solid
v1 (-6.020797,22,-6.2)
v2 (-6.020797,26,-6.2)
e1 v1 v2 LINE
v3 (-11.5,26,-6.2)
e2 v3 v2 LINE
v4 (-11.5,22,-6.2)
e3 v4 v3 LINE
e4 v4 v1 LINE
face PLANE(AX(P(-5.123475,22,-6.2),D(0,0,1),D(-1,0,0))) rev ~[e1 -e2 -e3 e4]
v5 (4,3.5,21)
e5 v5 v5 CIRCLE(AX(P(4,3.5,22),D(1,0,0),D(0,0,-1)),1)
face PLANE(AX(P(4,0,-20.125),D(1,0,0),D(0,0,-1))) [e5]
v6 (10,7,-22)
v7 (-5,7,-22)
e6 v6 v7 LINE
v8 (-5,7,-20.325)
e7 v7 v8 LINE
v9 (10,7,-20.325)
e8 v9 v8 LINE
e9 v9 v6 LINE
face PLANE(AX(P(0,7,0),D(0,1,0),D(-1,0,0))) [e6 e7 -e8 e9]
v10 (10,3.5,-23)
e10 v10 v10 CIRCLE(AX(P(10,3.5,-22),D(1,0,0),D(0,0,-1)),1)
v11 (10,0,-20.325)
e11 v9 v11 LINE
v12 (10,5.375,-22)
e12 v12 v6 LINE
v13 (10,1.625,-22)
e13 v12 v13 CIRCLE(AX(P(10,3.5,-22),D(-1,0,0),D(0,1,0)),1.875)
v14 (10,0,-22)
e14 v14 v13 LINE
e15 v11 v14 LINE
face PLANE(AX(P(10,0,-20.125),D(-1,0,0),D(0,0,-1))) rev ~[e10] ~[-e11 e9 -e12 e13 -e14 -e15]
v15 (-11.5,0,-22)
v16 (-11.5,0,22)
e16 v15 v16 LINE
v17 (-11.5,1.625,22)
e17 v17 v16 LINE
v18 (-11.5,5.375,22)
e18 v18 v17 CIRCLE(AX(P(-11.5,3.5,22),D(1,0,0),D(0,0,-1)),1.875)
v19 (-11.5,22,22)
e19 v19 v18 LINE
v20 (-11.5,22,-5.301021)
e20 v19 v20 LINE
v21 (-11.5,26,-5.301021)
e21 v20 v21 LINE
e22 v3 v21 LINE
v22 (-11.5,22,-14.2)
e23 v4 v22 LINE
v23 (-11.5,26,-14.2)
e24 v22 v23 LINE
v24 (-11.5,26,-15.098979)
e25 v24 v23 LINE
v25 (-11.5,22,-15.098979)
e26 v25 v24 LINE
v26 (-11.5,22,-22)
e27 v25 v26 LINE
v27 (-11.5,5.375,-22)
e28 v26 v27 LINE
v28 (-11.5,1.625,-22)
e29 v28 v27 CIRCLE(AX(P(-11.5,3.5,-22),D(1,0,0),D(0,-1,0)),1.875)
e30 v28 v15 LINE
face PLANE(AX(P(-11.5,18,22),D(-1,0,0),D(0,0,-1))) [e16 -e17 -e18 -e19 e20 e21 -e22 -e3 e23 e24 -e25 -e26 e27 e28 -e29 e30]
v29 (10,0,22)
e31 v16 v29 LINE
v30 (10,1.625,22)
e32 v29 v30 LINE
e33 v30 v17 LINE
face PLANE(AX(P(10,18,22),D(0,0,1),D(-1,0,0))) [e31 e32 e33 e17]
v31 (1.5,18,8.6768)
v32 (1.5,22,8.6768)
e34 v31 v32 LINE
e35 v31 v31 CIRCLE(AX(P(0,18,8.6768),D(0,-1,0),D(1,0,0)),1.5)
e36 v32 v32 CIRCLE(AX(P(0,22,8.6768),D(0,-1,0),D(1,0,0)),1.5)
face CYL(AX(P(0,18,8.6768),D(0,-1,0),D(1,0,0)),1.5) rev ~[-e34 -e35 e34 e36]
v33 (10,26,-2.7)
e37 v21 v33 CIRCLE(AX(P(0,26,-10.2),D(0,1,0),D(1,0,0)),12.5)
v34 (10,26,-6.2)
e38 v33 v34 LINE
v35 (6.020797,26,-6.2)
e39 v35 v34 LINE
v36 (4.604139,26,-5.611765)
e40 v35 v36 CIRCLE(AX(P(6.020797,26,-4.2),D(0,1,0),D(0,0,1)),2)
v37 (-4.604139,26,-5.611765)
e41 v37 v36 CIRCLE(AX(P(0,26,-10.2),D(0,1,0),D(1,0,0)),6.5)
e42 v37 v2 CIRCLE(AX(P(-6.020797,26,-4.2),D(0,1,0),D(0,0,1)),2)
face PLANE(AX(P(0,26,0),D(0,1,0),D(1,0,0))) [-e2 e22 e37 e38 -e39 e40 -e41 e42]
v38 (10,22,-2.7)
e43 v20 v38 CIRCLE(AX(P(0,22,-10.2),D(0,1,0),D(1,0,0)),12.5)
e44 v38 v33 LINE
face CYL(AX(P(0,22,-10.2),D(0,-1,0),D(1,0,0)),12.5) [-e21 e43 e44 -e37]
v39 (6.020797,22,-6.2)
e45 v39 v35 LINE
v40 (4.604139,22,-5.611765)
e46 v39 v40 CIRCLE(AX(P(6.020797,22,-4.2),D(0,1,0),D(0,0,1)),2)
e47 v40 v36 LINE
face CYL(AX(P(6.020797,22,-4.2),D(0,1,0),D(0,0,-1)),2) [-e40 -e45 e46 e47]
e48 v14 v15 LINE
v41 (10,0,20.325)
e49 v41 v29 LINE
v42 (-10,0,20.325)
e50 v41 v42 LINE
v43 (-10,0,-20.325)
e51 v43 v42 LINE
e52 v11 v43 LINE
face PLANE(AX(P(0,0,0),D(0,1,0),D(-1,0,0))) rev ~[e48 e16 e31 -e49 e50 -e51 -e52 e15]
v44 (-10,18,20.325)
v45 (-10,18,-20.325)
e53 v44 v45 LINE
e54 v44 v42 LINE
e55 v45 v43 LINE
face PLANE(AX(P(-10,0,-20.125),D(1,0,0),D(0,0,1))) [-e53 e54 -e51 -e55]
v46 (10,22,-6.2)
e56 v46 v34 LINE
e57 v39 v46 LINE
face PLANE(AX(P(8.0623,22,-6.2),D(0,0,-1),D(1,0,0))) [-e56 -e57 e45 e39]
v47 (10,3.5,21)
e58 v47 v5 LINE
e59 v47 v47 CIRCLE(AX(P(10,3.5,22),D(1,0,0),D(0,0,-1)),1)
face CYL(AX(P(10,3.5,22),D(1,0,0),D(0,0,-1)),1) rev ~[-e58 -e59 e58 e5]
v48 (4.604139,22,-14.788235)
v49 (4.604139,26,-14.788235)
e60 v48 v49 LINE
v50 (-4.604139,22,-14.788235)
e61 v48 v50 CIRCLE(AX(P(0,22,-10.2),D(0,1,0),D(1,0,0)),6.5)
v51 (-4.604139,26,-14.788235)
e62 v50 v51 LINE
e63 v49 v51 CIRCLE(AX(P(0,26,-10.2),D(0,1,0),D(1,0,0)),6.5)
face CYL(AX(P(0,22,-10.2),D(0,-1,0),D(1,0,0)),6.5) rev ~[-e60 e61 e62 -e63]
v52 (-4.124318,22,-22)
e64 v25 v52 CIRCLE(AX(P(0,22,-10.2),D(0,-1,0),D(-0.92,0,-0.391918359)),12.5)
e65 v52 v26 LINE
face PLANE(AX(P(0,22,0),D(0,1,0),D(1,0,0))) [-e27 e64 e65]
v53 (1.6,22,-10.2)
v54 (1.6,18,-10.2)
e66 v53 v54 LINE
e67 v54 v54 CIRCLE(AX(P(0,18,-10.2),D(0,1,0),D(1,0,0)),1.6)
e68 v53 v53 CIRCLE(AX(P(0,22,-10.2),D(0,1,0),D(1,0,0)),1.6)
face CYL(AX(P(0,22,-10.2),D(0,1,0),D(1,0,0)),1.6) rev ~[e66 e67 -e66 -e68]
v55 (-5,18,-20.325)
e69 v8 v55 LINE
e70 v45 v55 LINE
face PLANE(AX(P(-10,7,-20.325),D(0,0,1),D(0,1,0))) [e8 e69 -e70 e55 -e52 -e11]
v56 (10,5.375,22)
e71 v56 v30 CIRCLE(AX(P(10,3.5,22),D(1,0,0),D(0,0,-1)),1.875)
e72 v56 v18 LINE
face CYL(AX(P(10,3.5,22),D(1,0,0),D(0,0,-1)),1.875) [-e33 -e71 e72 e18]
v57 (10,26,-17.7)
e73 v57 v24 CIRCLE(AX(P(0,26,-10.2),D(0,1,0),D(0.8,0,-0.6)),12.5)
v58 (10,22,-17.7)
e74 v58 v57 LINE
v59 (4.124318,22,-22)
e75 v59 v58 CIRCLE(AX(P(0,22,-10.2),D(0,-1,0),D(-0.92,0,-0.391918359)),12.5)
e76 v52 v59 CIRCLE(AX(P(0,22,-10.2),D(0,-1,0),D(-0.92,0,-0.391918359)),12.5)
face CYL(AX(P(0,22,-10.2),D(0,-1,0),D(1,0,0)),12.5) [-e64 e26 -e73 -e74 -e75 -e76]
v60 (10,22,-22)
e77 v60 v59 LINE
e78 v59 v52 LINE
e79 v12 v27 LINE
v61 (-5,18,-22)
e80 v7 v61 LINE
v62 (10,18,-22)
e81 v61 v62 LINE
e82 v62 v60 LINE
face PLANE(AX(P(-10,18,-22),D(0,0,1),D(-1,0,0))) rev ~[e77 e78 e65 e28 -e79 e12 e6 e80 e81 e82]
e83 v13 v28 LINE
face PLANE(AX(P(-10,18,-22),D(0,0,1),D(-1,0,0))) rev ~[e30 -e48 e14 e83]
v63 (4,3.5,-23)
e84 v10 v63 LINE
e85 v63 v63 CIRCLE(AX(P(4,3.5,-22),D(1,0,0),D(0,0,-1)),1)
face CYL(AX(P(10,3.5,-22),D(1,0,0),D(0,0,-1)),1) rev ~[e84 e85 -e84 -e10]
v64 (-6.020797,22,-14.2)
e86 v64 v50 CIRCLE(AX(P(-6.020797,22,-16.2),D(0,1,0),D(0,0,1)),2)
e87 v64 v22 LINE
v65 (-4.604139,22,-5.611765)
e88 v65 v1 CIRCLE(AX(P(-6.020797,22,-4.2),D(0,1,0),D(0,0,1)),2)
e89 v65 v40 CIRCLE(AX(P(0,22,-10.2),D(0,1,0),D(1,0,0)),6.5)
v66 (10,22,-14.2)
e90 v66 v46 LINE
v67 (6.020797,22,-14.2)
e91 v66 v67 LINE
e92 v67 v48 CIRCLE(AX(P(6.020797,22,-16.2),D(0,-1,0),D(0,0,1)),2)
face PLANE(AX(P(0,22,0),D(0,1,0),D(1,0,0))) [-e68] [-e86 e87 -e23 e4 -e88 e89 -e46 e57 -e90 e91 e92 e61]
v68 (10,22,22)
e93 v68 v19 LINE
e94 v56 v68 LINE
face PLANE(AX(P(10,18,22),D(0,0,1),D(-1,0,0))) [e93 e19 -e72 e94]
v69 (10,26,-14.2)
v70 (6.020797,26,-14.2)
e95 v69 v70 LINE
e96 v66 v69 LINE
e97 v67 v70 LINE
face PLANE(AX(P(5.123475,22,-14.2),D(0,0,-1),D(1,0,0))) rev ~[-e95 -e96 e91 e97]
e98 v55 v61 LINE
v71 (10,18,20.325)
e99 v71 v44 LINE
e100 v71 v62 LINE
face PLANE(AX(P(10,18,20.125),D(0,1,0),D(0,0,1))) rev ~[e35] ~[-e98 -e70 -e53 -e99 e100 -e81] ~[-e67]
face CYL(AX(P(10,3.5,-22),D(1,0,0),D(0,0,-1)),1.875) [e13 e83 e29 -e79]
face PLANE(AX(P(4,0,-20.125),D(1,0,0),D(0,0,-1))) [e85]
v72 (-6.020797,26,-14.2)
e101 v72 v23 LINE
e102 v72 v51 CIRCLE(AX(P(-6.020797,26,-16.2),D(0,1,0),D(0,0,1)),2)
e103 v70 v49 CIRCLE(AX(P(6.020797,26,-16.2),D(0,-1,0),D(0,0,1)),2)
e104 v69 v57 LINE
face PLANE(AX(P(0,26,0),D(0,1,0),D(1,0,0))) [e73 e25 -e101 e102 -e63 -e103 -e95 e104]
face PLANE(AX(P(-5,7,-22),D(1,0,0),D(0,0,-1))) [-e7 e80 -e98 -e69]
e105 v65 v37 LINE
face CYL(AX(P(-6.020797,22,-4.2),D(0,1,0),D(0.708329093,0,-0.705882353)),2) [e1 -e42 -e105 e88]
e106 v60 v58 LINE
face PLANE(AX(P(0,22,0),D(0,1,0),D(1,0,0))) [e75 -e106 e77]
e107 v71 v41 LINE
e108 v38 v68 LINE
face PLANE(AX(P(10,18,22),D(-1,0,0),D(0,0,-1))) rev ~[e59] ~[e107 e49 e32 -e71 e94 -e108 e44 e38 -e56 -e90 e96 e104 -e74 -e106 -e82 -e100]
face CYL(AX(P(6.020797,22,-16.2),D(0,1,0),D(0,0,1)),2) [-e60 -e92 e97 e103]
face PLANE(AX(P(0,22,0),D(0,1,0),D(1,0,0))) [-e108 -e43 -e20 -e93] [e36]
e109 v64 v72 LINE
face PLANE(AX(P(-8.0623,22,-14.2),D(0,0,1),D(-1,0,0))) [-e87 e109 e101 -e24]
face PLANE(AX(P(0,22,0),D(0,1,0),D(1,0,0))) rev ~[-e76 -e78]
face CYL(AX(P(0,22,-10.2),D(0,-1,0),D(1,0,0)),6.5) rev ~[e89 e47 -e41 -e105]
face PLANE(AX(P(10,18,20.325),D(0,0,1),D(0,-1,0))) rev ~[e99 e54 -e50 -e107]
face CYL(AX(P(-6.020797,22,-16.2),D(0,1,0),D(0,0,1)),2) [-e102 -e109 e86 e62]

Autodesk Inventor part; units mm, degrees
ref_plane "YZ Plane" through (0, 0, 0) normal (1, 0, 0) x (0, 1, 0)
ref_plane "XZ Plane" through (0, 0, 0) normal (0, 1, 0) x (-1, 0, 0)
ref_plane "XY Plane" through (0, 0, 0) normal (0, 0, 1) x (1, 0, 0)
sketch "Sketch1" plane through (0, 0, 0) normal (0, 1, 0) x (-1, 0, 0)
  line L0 (-10, -20.125) -> (10, -20.125)
  line L1 (10, -20.125) -> (10, 20.125)
  line L2 (10, 20.125) -> (-10, 20.125)
  line L3 (-10, 20.125) -> (-10, -20.125)
  line L4 (-10, -20.125) -> (10, 20.125) construction
  line L5 (10, -20.125) -> (-10, 20.125) construction
  line L6 (-11.5, -22) -> (11.5, -22)
  line L7 (11.5, -22) -> (11.5, 22)
  line L8 (11.5, 22) -> (-11.5, 22)
  line L9 (-11.5, 22) -> (-11.5, -22)
  line L10 (-11.5, -22) -> (11.5, 22) construction
  line L11 (11.5, -22) -> (-11.5, 22) construction
  line L12 (-10, 20.125) -> (-10, 22)
  line L13 (-10, -20.125) -> (-10, -22)
  point P0 (0, 0)
  dimension "d0" = 20
  dimension "d1" = 40.25
  dimension "d2" = 23
  dimension "d3" = 44
extrude "Extrusion1" add sketch "Sketch1" along normal blind 7 contours L0 L1 L2 L12 L8 L7 L6 L13
sketch "Sketch2" plane through (-11.5, 0, -22) normal (-1, 0, 0) x (0, 0, 1)
  line L0 (44, 0) -> (0, 0)
  line L1 (0, 0) -> (0, 22)
  line L2 (0, 22) -> (44, 22)
  line L3 (44, 22) -> (44, 0)
  point P0 (22, 0)
  dimension "d6" = 44
  dimension "d7" = 22
sketch "Sketch3" plane through (0, 7, 0) normal (0, 1, 0) x (1, 0, 0)
  line L0 (-10, -20.125) -> (-10, 20.125) projected
  line L1 (-10, 20.125) -> (10, 20.125) projected
  line L2 (10, 20.125) -> (10, 22) projected
  line L3 (10, 22) -> (-11.5, 22) projected
  line L4 (-11.5, 22) -> (-11.5, -22) projected
  line L5 (-11.5, -22) -> (10, -22) projected
  line L6 (10, -22) -> (10, -20.125) projected
  line L7 (10, -20.125) -> (-10, -20.125) projected
  line L8 (-10, 20.125) -> (-10, 22)
  point P0 (0, 0)
extrude "Extrusion2" add sketch "Sketch3" along normal blind 11 contours L7 L6 L5 L4 L3 L8 L0
sketch "Sketch4" plane through (0, 18, 0) normal (0, 1, 0) x (1, 0, 0)
  line L0 (10, -22) -> (10, -20.125) projected
  line L1 (-10, 22) -> (-11.5, 22) projected
  line L2 (10, -22) -> (-11.5, -22)
  line L3 (-11.5, -22) -> (-11.5, 22)
  line L4 (-11.5, 22) -> (10, 22)
  line L5 (10, 22) -> (10, -22)
  point P0 (0, 0)
extrude "Extrusion3" add sketch "Sketch4" along normal blind 4
sketch "Sketch5" plane through (0, 22, 0) normal (0, 1, 0) x (1, 0, 0)
  line L0 (10, 20.125) -> (10, 22) projected
  line L1 (10, 22) -> (-11.5, 22) projected
  line L2 (10, 22) -> (-11.5, 22)
  circle A0 centre (0, 10.2) radius 6.5
  circle A1 centre (0, 10.2) radius 9
  line L3 (0, 10.2) -> (-11.5, 10.2)
  line L4 (-11.5, 22) -> (-11.5, -22) projected
  line L5 (0, 10.2) -> (0, 14.2)
  line L6 (0, 14.2) -> (-11.5, 14.2)
  line L7 (0, 10.2) -> (0, 6.2)
  line L8 (0, 6.2) -> (-11.5, 6.2)
  line L9 (0, 6.2) -> (10, 6.2)
  line L10 (0, 14.2) -> (10, 14.2)
  line L11 (10, -22) -> (10, 22) projected
  line L12 (-11.5, -22) -> (10, -22) projected
  line L13 (10, -22) -> (10, 22) projected
  line L14 (10, 22) -> (-11.5, 22) projected
  line L15 (-11.5, 22) -> (-11.5, -22) projected
  point P0 (0, 0)
  point P1 (0, 22)
  point P2 (5.1235, 14.2)
  point P3 (8.0623, 14.2)
  point P4 (-8.0623, 14.2)
  point P5 (-5.1235, 14.2)
  point P6 (8.0623, 6.2)
  point P7 (5.1235, 6.2)
  point P8 (-5.1235, 6.2)
  point P9 (-8.0623, 6.2)
  dimension "d12" = 11.8
  dimension "d13" = 13
  dimension "d14" = 18
  dimension "d15" = 4
  dimension "d16" = 4
extrude "Extrusion4" add sketch "Sketch5" along normal blind 4 contours L10 A0 L6 A1 | A1 L8 A0 L9
fillet "Fillet1" radius 2 4 edges at (-5.1235, 24, -14.2) (5.1235, 24, -14.2) (-5.1235, 24, -6.2) (5.1235, 24, -6.2)
sketch "Sketch6" plane through (0, 22, 0) normal (0, 1, 0) x (1, 0, 0)
  line L0 (8.0623, 14.2) -> (6.0208, 14.2) projected
  arc A0 (4.6041, 14.7882) -> (6.0208, 14.2) centre (6.0208, 16.2) ccw projected
  arc A1 (4.6041, 14.7882) -> (-4.6041, 14.7882) centre (0, 10.2) ccw projected
  arc A2 (-6.0208, 14.2) -> (-4.6041, 14.7882) centre (-6.0208, 16.2) ccw projected
  line L1 (-6.0208, 14.2) -> (-8.0623, 14.2) projected
  arc A3 (8.0623, 14.2) -> (-8.0623, 14.2) centre (0, 10.2) ccw projected
  line L2 (6.0208, 6.2) -> (8.0623, 6.2) projected
  arc A4 (-8.0623, 6.2) -> (8.0623, 6.2) centre (0, 10.2) ccw projected
  line L3 (-8.0623, 6.2) -> (-6.0208, 6.2) projected
  arc A5 (-4.6041, 5.6118) -> (-6.0208, 6.2) centre (-6.0208, 4.2) ccw projected
  arc A6 (-4.6041, 5.6118) -> (4.6041, 5.6118) centre (0, 10.2) ccw projected
  arc A7 (6.0208, 6.2) -> (4.6041, 5.6118) centre (6.0208, 4.2) ccw projected
  line L4 (-11.5, -22) -> (10, -22) projected
  line L5 (10, -22) -> (10, 22) projected
  line L6 (10, 22) -> (-11.5, 22) projected
  line L7 (-11.5, 22) -> (-11.5, -22) projected
  arc A8 (6.0208, 6.2) -> (4.6041, 5.6118) centre (6.0208, 4.2) ccw projected
  arc A9 (-4.6041, 5.6118) -> (4.6041, 5.6118) centre (0, 10.2) ccw projected
  arc A10 (-4.6041, 5.6118) -> (-6.0208, 6.2) centre (-6.0208, 4.2) ccw projected
  line L8 (-6.0208, 6.2) -> (-8.0623, 6.2) projected
  arc A11 (-8.0623, 6.2) -> (8.0623, 6.2) centre (0, 10.2) ccw projected
  line L9 (8.0623, 6.2) -> (6.0208, 6.2) projected
  arc A12 (4.6041, 14.7882) -> (6.0208, 14.2) centre (6.0208, 16.2) ccw projected
  line L10 (6.0208, 14.2) -> (8.0623, 14.2) projected
  arc A13 (8.0623, 14.2) -> (-8.0623, 14.2) centre (0, 10.2) ccw projected
  line L11 (-8.0623, 14.2) -> (-6.0208, 14.2) projected
  arc A14 (-6.0208, 14.2) -> (-4.6041, 14.7882) centre (-6.0208, 16.2) ccw projected
  arc A15 (4.6041, 14.7882) -> (-4.6041, 14.7882) centre (0, 10.2) ccw projected
  line L12 (-8.0623, 6.2) -> (-11.5, 6.2)
  line L13 (-8.0623, 14.2) -> (-11.5, 14.2)
  line L14 (-11.5, 22) -> (-11.5, -22) projected
  line L15 (8.0623, 6.2) -> (10, 6.2)
  line L16 (8.0623, 14.2) -> (10, 14.2)
  circle A16 centre (0, 10.2) radius 12.5
  circle A17 centre (0, 10.2) radius 1.6
  point P0 (0, 0)
  point P1 (-11.5, 5.301)
  point P2 (10, 2.7)
  point P3 (10, 17.7)
  point P4 (-11.5, 15.099)
  dimension "d20" = 25
  dimension "d21" = 3.2
extrude "Extrusion5" add sketch "Sketch6" along normal up to surface (4 mm away) contours A3 L13 L7 A16 L6 L5 L16 | L5 A16 L7 L12 A4 L15 | L6 A16
extrude "Extrusion6" cut sketch "Sketch6" against normal blind 10 contours A17
sketch "Sketch7" plane through (10, 0, -20.125) normal (1, 0, 0) x (0, 0, -1)
  line L0 (0, 0) -> (1.875, 0) projected
  line L1 (1.875, 0) -> (1.875, 7) projected
  line L2 (0, 7) -> (1.875, 7) projected
  line L3 (0, 0) -> (0, 7) projected
  line L4 (-42.125, 0) -> (-40.25, 0) projected
  line L5 (-40.25, 0) -> (-40.25, 18) projected
  line L6 (-40.25, 18) -> (1.875, 18) projected
  line L7 (1.875, 18) -> (1.875, 22) projected
  line L8 (-2.425, 22) -> (1.875, 22) projected
  line L9 (-2.425, 22) -> (-2.425, 26) projected
  line L10 (-2.425, 26) -> (-5.925, 26) projected
  line L11 (-5.925, 22) -> (-5.925, 26) projected
  line L12 (-13.925, 22) -> (-5.925, 22) projected
  line L13 (-13.925, 22) -> (-13.925, 26) projected
  line L14 (-13.925, 26) -> (-17.425, 26) projected
  line L15 (-17.425, 22) -> (-17.425, 26) projected
  line L16 (-42.125, 22) -> (-17.425, 22) projected
  line L17 (-42.125, 0) -> (-42.125, 22) projected
  line L18 (1.875, 0) -> (1.875, 7) projected
  circle A0 centre (1.875, 3.5) radius 1.875
  line L19 (-42.125, 0) -> (-42.125, 22) projected
  circle A1 centre (-42.125, 3.5) radius 1.875
  point P0 (-20.125, 0)
  point P1 (-42.125, 5.375)
  point P2 (-42.125, 1.625)
  point P3 (1.875, 5.375)
  point P4 (1.875, 1.625)
  dimension "d26" = 3.75
  dimension "d27" = 3.75
extrude "Extrusion7" add sketch "Sketch7" against normal up to surface (21.5 mm away) contours L1 A0 | A1 L17 picked at (2.2647, 3.9886) picked at (-43.0085, 3.7216)
sketch "Sketch8" plane through (10, 0, -20.125) normal (1, 0, 0) x (0, 0, -1)
  line L0 (0, 0) -> (1.875, 0) projected
  line L1 (1.875, 0) -> (1.875, 1.625) projected
  arc A0 (1.875, 1.625) -> (1.875, 5.375) centre (1.875, 3.5) ccw projected
  line L2 (1.875, 5.375) -> (1.875, 7) projected
  line L3 (0, 7) -> (1.875, 7) projected
  line L4 (0, 0) -> (0, 7) projected
  line L5 (-42.125, 0) -> (-40.25, 0) projected
  line L6 (-40.25, 0) -> (-40.25, 18) projected
  line L7 (-40.25, 18) -> (1.875, 18) projected
  line L8 (1.875, 18) -> (1.875, 22) projected
  line L9 (-2.425, 22) -> (1.875, 22) projected
  line L10 (-2.425, 22) -> (-2.425, 26) projected
  line L11 (-2.425, 26) -> (-5.925, 26) projected
  line L12 (-5.925, 22) -> (-5.925, 26) projected
  line L13 (-13.925, 22) -> (-5.925, 22) projected
  line L14 (-13.925, 22) -> (-13.925, 26) projected
  line L15 (-13.925, 26) -> (-17.425, 26) projected
  line L16 (-17.425, 22) -> (-17.425, 26) projected
  line L17 (-42.125, 22) -> (-17.425, 22) projected
  line L18 (-42.125, 5.375) -> (-42.125, 22) projected
  arc A1 (-42.125, 5.375) -> (-42.125, 1.625) centre (-42.125, 3.5) ccw projected
  line L19 (-42.125, 0) -> (-42.125, 1.625) projected
  circle A2 centre (-42.125, 3.5) radius 1
  circle A3 centre (1.875, 3.5) radius 1
  point P0 (-20.125, 0)
  dimension "d30" = 2
  dimension "d31" = 2
extrude "Extrusion8" cut sketch "Sketch8" against normal blind 6 contours A2 | A3
sketch "Sketch9" plane through (10, 0, 22) normal (1, 0, 0) x (0, 0, -1)
  line L0 (1.875, 0) -> (1.875, 18) projected
  line L1 (44, 0) -> (0, 0) projected
  line L2 (1.875, 18) -> (1.675, 18)
  line L3 (1.675, 18) -> (1.675, 0)
  line L4 (1.675, 0) -> (1.875, 0)
  line L5 (1.875, 0) -> (1.875, 18)
  line L6 (42.125, 0) -> (42.125, 7) projected
  line L7 (42.125, 0) -> (44, 0) projected
  line L8 (42.125, 7) -> (42.325, 7)
  line L9 (42.325, 7) -> (42.325, 0)
  line L10 (42.325, 0) -> (42.125, 0)
  line L11 (42.125, 0) -> (42.125, 7)
  point P0 (22, 0)
  dimension "d34" = 0.2
  dimension "d35" = 0.2
extrude "Extrusion9" cut sketch "Sketch9" against normal up to surface (20 mm away)
sketch "Sketch10" plane through (-10, 7, -22) normal (1, 0, 0) x (0, 0, -1)
  line L0 (-42.325, -7) -> (-1.675, -7) projected
  line L1 (-1.675, 0) -> (-1.675, -7) projected
  line L2 (0, 0) -> (-1.675, 0) projected
  line L3 (0, 0) -> (0, 11) projected
  line L4 (-42.325, 11) -> (0, 11) projected
  line L5 (-42.325, -7) -> (-42.325, 11) projected
  line L6 (0, 0) -> (-1.675, 0)
  line L7 (-1.675, 0) -> (-1.675, 11)
  line L8 (-1.675, 11) -> (0, 11)
  line L9 (0, 11) -> (0, 0)
  point P0 (-22, -7)
extrude "Extrusion10" add sketch "Sketch10" along normal blind 5 contours L7 L4 L3 L2
sketch "Sketch11" plane through (0, 18, 0) normal (0, -1, 0) x (1, 0, 0)
  circle A0 centre (0, 8.6768) radius 1.5
  point P0 (0, 0)
  dimension "d40" = 3
extrude "Extrusion11" cut sketch "Sketch11" against normal blind 5
properties part number "Gripper3overhead_3DPrint"
